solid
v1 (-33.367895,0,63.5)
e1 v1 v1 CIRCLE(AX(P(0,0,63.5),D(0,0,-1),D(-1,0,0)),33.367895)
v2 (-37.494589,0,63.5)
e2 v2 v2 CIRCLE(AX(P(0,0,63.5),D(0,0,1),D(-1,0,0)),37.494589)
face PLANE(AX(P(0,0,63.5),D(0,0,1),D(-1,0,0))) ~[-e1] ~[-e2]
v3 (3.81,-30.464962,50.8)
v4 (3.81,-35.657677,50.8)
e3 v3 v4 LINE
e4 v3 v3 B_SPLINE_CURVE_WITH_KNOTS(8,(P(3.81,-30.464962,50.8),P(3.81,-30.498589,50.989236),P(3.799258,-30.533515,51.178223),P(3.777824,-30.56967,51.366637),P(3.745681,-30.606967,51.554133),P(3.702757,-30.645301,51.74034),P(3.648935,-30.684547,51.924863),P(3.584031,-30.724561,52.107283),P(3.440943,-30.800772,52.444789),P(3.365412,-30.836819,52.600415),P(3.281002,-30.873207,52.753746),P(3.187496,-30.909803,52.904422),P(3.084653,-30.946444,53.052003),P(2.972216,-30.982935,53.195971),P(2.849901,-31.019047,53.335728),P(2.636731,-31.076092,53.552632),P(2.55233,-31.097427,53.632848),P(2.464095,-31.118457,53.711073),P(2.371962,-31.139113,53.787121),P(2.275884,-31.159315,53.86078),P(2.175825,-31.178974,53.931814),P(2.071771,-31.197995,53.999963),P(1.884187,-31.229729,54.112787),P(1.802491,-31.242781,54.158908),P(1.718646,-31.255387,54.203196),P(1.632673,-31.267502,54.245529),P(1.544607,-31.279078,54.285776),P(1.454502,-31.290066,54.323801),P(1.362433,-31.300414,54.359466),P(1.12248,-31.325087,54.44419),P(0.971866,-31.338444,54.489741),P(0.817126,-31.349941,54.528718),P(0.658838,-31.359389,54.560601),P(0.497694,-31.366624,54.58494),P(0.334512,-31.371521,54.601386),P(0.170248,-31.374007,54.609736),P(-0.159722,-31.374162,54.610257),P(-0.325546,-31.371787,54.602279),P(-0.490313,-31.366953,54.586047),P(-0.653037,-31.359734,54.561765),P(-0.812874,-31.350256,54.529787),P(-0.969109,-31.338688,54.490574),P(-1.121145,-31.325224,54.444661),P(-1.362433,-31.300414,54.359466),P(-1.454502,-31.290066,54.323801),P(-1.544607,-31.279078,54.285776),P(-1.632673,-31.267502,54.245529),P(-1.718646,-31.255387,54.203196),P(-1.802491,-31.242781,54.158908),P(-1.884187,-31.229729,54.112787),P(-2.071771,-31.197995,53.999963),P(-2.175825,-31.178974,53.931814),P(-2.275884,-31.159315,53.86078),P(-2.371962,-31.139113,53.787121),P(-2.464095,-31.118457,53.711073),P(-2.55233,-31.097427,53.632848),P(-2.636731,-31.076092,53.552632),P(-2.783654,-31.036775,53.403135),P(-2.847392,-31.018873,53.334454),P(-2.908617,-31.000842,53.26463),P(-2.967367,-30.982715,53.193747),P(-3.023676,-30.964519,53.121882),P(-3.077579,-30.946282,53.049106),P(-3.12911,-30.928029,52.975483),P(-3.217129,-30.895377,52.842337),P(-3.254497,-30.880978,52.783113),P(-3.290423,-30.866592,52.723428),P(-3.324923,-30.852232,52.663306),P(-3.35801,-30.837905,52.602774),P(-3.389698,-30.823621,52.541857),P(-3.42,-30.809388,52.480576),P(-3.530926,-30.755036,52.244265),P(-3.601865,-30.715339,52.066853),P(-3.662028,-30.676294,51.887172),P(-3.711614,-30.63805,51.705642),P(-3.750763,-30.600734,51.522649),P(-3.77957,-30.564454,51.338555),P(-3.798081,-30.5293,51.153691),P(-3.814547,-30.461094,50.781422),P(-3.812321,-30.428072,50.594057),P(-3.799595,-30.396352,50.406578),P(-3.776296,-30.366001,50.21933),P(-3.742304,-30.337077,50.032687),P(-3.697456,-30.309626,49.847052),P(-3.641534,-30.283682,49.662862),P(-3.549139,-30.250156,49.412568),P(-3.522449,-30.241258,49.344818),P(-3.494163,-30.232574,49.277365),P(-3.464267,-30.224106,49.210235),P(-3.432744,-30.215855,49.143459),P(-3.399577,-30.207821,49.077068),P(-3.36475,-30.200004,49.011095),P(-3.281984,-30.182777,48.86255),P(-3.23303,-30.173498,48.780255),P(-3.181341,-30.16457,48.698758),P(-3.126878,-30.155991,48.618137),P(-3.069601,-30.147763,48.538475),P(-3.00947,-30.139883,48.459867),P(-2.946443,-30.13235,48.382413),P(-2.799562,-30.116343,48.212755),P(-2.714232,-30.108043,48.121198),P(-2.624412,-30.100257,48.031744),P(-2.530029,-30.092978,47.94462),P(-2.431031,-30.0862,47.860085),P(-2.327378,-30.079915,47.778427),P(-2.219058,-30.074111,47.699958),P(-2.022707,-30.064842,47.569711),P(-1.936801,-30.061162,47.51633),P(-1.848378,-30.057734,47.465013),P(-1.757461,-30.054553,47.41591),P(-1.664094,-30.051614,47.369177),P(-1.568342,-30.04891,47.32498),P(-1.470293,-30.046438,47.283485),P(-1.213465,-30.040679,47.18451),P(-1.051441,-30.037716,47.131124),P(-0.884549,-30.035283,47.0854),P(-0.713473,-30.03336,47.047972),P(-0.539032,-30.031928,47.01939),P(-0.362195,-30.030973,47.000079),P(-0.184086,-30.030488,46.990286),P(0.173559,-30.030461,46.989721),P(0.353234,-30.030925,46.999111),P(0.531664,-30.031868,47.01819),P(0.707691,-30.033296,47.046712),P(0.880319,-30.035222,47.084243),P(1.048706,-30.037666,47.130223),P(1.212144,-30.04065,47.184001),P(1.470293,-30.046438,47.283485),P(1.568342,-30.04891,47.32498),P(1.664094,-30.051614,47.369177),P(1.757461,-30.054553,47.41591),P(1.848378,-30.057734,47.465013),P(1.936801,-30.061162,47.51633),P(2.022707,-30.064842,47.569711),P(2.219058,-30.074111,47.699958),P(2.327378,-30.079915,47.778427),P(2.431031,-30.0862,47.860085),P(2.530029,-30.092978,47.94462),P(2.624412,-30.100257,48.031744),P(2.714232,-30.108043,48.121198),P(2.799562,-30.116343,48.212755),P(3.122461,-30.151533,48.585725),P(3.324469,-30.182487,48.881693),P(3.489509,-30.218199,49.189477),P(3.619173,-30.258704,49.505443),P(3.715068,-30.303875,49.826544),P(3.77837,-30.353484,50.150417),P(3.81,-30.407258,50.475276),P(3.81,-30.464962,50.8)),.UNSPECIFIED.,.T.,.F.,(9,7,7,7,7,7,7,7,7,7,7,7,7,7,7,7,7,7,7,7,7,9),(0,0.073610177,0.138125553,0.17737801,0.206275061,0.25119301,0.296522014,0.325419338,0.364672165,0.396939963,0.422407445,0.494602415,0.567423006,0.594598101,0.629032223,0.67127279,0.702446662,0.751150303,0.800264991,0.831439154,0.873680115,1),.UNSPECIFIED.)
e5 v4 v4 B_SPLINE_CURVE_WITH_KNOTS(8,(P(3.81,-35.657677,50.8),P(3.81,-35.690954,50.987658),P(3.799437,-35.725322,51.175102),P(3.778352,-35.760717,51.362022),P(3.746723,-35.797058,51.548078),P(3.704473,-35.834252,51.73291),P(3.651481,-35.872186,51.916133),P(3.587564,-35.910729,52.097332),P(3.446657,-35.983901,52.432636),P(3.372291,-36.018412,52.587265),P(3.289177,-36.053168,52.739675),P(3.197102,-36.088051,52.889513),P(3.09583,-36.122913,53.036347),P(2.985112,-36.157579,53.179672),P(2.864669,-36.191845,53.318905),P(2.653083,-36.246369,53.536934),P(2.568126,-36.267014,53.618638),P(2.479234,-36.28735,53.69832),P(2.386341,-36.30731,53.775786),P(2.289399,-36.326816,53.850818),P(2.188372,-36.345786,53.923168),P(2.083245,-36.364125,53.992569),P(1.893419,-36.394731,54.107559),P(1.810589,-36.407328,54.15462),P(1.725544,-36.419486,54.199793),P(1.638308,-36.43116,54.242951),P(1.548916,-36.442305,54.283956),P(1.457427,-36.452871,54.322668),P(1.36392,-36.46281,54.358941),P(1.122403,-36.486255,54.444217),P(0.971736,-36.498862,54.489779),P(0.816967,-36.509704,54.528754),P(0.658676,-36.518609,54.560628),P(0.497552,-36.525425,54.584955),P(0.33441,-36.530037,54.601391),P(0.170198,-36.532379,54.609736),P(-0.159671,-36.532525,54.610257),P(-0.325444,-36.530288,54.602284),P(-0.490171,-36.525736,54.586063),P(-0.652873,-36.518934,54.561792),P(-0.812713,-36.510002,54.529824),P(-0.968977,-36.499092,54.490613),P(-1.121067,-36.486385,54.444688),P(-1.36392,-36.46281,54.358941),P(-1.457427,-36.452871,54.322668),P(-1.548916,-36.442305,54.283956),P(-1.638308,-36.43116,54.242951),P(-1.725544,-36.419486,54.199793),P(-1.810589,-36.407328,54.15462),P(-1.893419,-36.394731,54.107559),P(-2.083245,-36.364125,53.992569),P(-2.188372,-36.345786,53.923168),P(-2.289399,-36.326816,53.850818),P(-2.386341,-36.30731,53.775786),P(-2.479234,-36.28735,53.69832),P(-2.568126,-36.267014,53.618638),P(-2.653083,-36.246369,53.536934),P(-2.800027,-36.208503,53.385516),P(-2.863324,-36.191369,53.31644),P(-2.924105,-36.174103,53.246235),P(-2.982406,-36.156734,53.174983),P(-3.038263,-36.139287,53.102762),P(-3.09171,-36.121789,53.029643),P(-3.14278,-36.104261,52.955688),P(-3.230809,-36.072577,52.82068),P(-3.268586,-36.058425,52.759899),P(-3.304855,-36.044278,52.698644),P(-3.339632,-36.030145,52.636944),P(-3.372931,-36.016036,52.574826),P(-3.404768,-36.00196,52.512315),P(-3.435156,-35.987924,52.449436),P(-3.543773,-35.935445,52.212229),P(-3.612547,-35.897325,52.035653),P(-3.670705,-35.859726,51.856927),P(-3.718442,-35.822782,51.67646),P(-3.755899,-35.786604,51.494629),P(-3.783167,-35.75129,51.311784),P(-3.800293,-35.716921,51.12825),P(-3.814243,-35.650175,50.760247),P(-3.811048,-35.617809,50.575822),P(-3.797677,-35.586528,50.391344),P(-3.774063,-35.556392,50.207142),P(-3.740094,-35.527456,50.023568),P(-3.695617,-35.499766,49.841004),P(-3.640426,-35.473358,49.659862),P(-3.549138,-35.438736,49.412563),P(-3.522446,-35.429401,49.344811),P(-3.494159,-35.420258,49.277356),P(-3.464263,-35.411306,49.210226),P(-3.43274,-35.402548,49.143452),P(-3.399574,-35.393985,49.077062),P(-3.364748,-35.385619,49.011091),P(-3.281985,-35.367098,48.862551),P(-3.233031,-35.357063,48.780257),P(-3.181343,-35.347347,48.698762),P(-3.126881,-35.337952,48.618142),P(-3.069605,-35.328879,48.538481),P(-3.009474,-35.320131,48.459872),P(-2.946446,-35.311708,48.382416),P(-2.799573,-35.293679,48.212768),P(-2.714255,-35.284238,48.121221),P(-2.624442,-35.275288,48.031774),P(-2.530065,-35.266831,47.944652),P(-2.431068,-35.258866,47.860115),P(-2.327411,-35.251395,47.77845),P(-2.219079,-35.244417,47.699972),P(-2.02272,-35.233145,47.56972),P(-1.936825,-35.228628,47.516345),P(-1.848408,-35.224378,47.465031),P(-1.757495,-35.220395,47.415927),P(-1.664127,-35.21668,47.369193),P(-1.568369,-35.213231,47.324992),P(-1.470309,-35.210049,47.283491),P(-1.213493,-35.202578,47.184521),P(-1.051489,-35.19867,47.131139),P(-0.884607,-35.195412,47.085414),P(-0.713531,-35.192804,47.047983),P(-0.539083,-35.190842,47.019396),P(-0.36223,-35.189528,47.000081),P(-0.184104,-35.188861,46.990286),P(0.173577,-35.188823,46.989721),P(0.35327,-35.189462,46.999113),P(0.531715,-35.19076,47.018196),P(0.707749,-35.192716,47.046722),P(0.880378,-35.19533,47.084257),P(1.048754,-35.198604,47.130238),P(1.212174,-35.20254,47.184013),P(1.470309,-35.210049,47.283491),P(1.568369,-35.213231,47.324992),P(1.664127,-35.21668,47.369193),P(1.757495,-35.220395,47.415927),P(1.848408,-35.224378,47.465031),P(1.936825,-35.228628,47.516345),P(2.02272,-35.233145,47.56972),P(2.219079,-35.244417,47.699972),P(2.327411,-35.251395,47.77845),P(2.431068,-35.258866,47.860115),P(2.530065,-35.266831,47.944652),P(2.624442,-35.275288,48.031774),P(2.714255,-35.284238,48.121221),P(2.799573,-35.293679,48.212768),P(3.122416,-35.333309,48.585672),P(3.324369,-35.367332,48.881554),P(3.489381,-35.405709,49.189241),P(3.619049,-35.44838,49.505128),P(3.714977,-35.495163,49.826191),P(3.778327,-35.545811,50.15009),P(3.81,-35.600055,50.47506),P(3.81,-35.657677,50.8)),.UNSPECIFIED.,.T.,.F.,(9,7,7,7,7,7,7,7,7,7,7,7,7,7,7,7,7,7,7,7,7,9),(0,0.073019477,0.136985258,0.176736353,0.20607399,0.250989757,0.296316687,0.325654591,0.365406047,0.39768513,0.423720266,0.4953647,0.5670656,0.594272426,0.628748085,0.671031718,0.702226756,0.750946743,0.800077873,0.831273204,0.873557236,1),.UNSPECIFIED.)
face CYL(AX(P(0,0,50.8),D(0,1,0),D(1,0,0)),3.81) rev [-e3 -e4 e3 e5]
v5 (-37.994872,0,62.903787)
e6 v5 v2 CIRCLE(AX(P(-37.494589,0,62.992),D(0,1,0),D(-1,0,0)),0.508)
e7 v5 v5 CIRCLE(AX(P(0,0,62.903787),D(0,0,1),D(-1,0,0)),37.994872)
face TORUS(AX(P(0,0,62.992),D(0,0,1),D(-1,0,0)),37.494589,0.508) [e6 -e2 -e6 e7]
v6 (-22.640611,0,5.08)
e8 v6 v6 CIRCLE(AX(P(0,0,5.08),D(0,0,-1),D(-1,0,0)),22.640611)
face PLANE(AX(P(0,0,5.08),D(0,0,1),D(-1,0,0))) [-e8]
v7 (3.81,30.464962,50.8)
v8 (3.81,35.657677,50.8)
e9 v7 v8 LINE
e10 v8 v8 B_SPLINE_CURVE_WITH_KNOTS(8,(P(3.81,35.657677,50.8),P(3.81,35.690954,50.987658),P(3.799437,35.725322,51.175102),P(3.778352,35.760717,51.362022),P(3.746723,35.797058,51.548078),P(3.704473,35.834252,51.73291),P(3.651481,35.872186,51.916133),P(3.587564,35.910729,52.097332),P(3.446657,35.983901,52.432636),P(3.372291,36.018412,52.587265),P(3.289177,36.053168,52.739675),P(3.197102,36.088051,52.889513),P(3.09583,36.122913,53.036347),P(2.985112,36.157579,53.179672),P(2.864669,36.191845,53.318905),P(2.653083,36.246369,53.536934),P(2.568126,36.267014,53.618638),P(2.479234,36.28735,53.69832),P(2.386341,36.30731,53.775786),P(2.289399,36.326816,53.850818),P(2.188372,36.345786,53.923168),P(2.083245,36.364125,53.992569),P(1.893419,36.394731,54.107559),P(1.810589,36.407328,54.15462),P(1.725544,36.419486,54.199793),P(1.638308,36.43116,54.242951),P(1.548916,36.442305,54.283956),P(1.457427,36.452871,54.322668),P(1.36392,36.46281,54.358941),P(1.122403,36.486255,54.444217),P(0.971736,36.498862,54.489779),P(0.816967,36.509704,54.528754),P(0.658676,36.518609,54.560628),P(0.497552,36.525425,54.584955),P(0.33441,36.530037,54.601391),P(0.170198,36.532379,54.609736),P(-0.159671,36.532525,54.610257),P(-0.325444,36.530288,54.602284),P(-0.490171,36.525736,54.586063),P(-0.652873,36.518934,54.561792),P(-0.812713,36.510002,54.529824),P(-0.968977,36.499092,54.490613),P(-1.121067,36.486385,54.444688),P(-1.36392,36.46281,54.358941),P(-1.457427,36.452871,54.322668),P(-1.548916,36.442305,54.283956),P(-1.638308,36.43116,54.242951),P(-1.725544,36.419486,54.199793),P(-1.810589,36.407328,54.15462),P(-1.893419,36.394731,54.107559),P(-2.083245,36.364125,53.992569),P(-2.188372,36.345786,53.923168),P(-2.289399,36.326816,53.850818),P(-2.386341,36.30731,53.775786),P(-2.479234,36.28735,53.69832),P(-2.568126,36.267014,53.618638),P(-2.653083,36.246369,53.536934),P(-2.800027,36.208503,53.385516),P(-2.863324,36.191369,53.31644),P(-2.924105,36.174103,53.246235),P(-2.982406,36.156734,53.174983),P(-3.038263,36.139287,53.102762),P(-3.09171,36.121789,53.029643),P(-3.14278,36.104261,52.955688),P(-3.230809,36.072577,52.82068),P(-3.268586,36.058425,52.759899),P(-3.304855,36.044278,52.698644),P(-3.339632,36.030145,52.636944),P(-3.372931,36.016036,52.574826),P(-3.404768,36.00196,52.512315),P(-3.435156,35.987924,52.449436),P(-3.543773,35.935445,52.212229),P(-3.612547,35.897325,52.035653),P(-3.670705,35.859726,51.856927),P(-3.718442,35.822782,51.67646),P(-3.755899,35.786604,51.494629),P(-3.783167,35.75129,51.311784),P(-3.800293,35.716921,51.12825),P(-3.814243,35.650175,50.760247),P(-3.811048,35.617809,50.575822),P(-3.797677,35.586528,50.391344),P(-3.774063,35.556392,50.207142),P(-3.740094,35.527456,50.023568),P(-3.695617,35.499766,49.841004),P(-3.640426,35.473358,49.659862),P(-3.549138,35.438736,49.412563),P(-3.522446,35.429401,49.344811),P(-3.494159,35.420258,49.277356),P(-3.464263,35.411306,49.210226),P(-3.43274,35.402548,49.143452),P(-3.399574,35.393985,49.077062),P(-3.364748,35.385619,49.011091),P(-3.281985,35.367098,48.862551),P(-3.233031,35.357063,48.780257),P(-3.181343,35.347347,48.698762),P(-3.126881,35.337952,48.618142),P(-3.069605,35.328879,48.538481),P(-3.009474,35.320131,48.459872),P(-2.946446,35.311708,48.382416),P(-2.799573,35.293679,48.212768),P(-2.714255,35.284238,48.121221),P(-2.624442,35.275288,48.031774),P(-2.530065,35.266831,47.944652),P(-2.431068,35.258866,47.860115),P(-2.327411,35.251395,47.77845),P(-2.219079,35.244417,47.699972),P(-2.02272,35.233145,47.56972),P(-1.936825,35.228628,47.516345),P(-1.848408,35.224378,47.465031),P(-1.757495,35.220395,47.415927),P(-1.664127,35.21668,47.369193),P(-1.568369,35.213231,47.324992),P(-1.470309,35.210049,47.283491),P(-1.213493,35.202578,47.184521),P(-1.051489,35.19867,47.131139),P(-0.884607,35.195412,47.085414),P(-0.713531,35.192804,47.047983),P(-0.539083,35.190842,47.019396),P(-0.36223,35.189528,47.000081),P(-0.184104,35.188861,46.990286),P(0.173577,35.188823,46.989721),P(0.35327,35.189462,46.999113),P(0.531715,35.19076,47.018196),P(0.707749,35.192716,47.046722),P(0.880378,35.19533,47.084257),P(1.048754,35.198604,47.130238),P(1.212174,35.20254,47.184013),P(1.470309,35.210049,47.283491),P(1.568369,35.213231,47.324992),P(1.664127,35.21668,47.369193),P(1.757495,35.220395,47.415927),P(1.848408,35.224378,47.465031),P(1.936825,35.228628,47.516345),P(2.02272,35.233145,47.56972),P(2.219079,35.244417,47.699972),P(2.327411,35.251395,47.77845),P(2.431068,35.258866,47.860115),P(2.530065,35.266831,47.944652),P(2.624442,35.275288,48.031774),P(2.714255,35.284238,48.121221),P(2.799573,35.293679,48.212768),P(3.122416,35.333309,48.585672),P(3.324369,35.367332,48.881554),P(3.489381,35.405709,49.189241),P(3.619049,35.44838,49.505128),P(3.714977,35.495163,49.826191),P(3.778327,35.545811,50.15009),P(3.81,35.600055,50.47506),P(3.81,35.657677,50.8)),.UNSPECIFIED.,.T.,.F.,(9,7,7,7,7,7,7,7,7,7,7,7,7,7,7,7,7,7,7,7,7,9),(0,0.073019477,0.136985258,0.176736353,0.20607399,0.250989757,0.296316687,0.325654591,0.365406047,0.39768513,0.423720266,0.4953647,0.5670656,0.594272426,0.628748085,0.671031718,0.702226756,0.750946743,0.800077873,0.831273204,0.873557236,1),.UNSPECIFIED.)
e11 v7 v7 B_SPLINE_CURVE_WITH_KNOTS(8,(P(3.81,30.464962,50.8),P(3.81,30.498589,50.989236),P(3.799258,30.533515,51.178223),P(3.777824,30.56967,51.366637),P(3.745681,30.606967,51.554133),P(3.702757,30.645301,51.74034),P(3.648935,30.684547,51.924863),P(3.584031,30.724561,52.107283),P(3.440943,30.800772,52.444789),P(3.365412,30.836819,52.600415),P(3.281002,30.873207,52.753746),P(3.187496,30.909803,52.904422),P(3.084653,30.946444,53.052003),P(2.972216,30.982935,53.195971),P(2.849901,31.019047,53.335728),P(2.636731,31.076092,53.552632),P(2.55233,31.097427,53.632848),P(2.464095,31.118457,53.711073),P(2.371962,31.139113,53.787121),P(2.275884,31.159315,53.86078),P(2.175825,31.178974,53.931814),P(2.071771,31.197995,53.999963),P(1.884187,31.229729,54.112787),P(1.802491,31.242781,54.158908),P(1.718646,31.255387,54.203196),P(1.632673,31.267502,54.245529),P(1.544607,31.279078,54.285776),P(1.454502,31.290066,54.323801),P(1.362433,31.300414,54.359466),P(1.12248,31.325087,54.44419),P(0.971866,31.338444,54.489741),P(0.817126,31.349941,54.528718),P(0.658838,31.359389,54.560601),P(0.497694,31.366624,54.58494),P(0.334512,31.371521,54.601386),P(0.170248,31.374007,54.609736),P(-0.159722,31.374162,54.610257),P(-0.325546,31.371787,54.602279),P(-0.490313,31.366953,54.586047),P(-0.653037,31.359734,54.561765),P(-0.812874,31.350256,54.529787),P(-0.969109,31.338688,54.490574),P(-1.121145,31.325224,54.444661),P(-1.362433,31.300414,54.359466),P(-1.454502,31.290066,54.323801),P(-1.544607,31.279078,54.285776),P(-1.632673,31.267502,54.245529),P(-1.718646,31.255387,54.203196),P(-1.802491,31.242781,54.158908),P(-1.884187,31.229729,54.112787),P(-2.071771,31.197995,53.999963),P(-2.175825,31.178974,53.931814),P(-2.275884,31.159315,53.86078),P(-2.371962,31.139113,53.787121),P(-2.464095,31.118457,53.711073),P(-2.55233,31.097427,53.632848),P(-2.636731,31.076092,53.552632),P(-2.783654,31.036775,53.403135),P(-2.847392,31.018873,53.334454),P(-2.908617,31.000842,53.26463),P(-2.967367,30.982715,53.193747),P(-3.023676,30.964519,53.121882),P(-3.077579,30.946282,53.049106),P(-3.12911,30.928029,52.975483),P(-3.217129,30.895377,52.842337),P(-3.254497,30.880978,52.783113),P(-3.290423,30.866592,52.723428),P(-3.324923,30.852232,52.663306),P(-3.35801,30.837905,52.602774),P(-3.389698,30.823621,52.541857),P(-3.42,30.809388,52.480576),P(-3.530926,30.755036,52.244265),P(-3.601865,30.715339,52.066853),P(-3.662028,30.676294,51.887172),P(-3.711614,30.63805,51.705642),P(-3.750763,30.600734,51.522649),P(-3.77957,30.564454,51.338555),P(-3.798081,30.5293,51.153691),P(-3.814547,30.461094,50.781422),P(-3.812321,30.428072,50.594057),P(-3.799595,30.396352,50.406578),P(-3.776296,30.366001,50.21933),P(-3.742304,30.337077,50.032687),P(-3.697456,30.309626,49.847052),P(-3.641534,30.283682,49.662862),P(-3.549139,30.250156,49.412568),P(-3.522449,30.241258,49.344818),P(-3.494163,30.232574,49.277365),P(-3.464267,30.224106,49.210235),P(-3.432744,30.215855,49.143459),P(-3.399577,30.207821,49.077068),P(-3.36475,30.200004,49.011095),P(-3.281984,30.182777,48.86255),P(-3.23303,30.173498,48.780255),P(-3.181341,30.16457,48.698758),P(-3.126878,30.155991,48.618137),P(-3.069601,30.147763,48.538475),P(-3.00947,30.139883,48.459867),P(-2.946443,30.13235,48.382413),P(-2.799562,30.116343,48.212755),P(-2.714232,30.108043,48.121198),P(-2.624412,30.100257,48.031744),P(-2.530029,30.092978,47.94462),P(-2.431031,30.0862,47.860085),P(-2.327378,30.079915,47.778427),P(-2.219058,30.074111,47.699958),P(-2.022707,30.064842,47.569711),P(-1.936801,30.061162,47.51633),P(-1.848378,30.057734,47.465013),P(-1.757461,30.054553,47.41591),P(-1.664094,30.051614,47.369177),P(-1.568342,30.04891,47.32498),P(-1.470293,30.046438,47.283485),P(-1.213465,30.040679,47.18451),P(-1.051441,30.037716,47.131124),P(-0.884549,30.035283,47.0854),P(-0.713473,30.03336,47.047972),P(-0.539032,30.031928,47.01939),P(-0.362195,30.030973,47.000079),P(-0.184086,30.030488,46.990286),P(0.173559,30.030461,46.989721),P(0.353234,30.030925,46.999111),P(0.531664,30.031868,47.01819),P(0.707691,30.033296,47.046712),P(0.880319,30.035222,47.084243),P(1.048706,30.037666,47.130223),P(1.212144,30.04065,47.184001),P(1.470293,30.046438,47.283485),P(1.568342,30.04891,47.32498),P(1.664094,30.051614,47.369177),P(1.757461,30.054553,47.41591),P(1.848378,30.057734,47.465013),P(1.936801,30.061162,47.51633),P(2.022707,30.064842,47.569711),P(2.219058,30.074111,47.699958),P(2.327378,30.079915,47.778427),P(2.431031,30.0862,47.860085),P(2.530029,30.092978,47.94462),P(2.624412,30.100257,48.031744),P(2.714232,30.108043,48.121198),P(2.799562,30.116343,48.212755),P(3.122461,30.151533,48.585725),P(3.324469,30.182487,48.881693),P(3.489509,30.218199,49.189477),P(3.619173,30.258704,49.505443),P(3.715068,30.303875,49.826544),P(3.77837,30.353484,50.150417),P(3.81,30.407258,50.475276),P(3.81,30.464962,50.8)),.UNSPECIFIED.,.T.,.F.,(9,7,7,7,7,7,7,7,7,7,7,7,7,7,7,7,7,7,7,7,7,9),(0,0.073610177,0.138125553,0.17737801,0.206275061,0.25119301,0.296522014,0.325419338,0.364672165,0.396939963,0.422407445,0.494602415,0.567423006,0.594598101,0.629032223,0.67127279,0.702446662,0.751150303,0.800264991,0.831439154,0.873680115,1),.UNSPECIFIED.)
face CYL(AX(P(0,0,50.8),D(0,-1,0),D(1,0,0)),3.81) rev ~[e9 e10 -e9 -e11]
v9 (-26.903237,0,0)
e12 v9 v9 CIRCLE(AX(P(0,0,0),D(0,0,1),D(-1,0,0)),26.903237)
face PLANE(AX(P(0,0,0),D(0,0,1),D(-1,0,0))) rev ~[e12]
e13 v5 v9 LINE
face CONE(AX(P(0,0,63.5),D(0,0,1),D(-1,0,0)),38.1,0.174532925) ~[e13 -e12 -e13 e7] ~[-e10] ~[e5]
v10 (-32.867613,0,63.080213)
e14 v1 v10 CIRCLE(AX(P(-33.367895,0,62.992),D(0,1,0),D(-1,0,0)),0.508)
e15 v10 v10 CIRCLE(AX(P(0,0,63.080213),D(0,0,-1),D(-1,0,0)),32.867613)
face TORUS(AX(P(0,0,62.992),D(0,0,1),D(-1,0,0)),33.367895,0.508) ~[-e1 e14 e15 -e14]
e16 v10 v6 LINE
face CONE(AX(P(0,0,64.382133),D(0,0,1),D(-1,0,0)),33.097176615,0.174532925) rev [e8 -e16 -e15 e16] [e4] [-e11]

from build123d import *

# Parameters (mm, degrees)
F2_T          = -5.08
F3_R          = 3.81
F4_DEPTH      = 50.292
F4_DEPTH_BACK = 74.168
F5_R          = 0.508


with BuildPart() as f1:
    # F0 (on Front) → F1 (revolve)
    with BuildSketch(Plane.XZ):
        Polygon((0, 0), (0, 63.5), (-38.1, 63.5), (-26.903236725, 0), align=None)
    revolve(axis=Axis((0, 0, 31.75), (0, 0, 1)))

    # F2
    f2_openings = [f1.faces().sort_by_distance(p)[0] for p in [
        (0, 0, 63.5),
    ]]
    offset(amount=F2_T, openings=f2_openings)

    # F3 (on Front) → F4 (cut, two sides)
    with BuildSketch(Plane.XZ) as f4_sk:
        with Locations((0, 50.8)):
            Circle(F3_R)
    extrude(amount=-F4_DEPTH, mode=Mode.SUBTRACT)
    extrude(f4_sk.sketch, amount=F4_DEPTH_BACK, mode=Mode.SUBTRACT)

    # F5
    f5_edges = [f1.edges().sort_by_distance(p)[0] for p in [
        (32.941633, 0, 63.5),
        (38.1, 0, 63.5),
    ]]
    fillet(f5_edges, radius=F5_R)


solid = f1.part
